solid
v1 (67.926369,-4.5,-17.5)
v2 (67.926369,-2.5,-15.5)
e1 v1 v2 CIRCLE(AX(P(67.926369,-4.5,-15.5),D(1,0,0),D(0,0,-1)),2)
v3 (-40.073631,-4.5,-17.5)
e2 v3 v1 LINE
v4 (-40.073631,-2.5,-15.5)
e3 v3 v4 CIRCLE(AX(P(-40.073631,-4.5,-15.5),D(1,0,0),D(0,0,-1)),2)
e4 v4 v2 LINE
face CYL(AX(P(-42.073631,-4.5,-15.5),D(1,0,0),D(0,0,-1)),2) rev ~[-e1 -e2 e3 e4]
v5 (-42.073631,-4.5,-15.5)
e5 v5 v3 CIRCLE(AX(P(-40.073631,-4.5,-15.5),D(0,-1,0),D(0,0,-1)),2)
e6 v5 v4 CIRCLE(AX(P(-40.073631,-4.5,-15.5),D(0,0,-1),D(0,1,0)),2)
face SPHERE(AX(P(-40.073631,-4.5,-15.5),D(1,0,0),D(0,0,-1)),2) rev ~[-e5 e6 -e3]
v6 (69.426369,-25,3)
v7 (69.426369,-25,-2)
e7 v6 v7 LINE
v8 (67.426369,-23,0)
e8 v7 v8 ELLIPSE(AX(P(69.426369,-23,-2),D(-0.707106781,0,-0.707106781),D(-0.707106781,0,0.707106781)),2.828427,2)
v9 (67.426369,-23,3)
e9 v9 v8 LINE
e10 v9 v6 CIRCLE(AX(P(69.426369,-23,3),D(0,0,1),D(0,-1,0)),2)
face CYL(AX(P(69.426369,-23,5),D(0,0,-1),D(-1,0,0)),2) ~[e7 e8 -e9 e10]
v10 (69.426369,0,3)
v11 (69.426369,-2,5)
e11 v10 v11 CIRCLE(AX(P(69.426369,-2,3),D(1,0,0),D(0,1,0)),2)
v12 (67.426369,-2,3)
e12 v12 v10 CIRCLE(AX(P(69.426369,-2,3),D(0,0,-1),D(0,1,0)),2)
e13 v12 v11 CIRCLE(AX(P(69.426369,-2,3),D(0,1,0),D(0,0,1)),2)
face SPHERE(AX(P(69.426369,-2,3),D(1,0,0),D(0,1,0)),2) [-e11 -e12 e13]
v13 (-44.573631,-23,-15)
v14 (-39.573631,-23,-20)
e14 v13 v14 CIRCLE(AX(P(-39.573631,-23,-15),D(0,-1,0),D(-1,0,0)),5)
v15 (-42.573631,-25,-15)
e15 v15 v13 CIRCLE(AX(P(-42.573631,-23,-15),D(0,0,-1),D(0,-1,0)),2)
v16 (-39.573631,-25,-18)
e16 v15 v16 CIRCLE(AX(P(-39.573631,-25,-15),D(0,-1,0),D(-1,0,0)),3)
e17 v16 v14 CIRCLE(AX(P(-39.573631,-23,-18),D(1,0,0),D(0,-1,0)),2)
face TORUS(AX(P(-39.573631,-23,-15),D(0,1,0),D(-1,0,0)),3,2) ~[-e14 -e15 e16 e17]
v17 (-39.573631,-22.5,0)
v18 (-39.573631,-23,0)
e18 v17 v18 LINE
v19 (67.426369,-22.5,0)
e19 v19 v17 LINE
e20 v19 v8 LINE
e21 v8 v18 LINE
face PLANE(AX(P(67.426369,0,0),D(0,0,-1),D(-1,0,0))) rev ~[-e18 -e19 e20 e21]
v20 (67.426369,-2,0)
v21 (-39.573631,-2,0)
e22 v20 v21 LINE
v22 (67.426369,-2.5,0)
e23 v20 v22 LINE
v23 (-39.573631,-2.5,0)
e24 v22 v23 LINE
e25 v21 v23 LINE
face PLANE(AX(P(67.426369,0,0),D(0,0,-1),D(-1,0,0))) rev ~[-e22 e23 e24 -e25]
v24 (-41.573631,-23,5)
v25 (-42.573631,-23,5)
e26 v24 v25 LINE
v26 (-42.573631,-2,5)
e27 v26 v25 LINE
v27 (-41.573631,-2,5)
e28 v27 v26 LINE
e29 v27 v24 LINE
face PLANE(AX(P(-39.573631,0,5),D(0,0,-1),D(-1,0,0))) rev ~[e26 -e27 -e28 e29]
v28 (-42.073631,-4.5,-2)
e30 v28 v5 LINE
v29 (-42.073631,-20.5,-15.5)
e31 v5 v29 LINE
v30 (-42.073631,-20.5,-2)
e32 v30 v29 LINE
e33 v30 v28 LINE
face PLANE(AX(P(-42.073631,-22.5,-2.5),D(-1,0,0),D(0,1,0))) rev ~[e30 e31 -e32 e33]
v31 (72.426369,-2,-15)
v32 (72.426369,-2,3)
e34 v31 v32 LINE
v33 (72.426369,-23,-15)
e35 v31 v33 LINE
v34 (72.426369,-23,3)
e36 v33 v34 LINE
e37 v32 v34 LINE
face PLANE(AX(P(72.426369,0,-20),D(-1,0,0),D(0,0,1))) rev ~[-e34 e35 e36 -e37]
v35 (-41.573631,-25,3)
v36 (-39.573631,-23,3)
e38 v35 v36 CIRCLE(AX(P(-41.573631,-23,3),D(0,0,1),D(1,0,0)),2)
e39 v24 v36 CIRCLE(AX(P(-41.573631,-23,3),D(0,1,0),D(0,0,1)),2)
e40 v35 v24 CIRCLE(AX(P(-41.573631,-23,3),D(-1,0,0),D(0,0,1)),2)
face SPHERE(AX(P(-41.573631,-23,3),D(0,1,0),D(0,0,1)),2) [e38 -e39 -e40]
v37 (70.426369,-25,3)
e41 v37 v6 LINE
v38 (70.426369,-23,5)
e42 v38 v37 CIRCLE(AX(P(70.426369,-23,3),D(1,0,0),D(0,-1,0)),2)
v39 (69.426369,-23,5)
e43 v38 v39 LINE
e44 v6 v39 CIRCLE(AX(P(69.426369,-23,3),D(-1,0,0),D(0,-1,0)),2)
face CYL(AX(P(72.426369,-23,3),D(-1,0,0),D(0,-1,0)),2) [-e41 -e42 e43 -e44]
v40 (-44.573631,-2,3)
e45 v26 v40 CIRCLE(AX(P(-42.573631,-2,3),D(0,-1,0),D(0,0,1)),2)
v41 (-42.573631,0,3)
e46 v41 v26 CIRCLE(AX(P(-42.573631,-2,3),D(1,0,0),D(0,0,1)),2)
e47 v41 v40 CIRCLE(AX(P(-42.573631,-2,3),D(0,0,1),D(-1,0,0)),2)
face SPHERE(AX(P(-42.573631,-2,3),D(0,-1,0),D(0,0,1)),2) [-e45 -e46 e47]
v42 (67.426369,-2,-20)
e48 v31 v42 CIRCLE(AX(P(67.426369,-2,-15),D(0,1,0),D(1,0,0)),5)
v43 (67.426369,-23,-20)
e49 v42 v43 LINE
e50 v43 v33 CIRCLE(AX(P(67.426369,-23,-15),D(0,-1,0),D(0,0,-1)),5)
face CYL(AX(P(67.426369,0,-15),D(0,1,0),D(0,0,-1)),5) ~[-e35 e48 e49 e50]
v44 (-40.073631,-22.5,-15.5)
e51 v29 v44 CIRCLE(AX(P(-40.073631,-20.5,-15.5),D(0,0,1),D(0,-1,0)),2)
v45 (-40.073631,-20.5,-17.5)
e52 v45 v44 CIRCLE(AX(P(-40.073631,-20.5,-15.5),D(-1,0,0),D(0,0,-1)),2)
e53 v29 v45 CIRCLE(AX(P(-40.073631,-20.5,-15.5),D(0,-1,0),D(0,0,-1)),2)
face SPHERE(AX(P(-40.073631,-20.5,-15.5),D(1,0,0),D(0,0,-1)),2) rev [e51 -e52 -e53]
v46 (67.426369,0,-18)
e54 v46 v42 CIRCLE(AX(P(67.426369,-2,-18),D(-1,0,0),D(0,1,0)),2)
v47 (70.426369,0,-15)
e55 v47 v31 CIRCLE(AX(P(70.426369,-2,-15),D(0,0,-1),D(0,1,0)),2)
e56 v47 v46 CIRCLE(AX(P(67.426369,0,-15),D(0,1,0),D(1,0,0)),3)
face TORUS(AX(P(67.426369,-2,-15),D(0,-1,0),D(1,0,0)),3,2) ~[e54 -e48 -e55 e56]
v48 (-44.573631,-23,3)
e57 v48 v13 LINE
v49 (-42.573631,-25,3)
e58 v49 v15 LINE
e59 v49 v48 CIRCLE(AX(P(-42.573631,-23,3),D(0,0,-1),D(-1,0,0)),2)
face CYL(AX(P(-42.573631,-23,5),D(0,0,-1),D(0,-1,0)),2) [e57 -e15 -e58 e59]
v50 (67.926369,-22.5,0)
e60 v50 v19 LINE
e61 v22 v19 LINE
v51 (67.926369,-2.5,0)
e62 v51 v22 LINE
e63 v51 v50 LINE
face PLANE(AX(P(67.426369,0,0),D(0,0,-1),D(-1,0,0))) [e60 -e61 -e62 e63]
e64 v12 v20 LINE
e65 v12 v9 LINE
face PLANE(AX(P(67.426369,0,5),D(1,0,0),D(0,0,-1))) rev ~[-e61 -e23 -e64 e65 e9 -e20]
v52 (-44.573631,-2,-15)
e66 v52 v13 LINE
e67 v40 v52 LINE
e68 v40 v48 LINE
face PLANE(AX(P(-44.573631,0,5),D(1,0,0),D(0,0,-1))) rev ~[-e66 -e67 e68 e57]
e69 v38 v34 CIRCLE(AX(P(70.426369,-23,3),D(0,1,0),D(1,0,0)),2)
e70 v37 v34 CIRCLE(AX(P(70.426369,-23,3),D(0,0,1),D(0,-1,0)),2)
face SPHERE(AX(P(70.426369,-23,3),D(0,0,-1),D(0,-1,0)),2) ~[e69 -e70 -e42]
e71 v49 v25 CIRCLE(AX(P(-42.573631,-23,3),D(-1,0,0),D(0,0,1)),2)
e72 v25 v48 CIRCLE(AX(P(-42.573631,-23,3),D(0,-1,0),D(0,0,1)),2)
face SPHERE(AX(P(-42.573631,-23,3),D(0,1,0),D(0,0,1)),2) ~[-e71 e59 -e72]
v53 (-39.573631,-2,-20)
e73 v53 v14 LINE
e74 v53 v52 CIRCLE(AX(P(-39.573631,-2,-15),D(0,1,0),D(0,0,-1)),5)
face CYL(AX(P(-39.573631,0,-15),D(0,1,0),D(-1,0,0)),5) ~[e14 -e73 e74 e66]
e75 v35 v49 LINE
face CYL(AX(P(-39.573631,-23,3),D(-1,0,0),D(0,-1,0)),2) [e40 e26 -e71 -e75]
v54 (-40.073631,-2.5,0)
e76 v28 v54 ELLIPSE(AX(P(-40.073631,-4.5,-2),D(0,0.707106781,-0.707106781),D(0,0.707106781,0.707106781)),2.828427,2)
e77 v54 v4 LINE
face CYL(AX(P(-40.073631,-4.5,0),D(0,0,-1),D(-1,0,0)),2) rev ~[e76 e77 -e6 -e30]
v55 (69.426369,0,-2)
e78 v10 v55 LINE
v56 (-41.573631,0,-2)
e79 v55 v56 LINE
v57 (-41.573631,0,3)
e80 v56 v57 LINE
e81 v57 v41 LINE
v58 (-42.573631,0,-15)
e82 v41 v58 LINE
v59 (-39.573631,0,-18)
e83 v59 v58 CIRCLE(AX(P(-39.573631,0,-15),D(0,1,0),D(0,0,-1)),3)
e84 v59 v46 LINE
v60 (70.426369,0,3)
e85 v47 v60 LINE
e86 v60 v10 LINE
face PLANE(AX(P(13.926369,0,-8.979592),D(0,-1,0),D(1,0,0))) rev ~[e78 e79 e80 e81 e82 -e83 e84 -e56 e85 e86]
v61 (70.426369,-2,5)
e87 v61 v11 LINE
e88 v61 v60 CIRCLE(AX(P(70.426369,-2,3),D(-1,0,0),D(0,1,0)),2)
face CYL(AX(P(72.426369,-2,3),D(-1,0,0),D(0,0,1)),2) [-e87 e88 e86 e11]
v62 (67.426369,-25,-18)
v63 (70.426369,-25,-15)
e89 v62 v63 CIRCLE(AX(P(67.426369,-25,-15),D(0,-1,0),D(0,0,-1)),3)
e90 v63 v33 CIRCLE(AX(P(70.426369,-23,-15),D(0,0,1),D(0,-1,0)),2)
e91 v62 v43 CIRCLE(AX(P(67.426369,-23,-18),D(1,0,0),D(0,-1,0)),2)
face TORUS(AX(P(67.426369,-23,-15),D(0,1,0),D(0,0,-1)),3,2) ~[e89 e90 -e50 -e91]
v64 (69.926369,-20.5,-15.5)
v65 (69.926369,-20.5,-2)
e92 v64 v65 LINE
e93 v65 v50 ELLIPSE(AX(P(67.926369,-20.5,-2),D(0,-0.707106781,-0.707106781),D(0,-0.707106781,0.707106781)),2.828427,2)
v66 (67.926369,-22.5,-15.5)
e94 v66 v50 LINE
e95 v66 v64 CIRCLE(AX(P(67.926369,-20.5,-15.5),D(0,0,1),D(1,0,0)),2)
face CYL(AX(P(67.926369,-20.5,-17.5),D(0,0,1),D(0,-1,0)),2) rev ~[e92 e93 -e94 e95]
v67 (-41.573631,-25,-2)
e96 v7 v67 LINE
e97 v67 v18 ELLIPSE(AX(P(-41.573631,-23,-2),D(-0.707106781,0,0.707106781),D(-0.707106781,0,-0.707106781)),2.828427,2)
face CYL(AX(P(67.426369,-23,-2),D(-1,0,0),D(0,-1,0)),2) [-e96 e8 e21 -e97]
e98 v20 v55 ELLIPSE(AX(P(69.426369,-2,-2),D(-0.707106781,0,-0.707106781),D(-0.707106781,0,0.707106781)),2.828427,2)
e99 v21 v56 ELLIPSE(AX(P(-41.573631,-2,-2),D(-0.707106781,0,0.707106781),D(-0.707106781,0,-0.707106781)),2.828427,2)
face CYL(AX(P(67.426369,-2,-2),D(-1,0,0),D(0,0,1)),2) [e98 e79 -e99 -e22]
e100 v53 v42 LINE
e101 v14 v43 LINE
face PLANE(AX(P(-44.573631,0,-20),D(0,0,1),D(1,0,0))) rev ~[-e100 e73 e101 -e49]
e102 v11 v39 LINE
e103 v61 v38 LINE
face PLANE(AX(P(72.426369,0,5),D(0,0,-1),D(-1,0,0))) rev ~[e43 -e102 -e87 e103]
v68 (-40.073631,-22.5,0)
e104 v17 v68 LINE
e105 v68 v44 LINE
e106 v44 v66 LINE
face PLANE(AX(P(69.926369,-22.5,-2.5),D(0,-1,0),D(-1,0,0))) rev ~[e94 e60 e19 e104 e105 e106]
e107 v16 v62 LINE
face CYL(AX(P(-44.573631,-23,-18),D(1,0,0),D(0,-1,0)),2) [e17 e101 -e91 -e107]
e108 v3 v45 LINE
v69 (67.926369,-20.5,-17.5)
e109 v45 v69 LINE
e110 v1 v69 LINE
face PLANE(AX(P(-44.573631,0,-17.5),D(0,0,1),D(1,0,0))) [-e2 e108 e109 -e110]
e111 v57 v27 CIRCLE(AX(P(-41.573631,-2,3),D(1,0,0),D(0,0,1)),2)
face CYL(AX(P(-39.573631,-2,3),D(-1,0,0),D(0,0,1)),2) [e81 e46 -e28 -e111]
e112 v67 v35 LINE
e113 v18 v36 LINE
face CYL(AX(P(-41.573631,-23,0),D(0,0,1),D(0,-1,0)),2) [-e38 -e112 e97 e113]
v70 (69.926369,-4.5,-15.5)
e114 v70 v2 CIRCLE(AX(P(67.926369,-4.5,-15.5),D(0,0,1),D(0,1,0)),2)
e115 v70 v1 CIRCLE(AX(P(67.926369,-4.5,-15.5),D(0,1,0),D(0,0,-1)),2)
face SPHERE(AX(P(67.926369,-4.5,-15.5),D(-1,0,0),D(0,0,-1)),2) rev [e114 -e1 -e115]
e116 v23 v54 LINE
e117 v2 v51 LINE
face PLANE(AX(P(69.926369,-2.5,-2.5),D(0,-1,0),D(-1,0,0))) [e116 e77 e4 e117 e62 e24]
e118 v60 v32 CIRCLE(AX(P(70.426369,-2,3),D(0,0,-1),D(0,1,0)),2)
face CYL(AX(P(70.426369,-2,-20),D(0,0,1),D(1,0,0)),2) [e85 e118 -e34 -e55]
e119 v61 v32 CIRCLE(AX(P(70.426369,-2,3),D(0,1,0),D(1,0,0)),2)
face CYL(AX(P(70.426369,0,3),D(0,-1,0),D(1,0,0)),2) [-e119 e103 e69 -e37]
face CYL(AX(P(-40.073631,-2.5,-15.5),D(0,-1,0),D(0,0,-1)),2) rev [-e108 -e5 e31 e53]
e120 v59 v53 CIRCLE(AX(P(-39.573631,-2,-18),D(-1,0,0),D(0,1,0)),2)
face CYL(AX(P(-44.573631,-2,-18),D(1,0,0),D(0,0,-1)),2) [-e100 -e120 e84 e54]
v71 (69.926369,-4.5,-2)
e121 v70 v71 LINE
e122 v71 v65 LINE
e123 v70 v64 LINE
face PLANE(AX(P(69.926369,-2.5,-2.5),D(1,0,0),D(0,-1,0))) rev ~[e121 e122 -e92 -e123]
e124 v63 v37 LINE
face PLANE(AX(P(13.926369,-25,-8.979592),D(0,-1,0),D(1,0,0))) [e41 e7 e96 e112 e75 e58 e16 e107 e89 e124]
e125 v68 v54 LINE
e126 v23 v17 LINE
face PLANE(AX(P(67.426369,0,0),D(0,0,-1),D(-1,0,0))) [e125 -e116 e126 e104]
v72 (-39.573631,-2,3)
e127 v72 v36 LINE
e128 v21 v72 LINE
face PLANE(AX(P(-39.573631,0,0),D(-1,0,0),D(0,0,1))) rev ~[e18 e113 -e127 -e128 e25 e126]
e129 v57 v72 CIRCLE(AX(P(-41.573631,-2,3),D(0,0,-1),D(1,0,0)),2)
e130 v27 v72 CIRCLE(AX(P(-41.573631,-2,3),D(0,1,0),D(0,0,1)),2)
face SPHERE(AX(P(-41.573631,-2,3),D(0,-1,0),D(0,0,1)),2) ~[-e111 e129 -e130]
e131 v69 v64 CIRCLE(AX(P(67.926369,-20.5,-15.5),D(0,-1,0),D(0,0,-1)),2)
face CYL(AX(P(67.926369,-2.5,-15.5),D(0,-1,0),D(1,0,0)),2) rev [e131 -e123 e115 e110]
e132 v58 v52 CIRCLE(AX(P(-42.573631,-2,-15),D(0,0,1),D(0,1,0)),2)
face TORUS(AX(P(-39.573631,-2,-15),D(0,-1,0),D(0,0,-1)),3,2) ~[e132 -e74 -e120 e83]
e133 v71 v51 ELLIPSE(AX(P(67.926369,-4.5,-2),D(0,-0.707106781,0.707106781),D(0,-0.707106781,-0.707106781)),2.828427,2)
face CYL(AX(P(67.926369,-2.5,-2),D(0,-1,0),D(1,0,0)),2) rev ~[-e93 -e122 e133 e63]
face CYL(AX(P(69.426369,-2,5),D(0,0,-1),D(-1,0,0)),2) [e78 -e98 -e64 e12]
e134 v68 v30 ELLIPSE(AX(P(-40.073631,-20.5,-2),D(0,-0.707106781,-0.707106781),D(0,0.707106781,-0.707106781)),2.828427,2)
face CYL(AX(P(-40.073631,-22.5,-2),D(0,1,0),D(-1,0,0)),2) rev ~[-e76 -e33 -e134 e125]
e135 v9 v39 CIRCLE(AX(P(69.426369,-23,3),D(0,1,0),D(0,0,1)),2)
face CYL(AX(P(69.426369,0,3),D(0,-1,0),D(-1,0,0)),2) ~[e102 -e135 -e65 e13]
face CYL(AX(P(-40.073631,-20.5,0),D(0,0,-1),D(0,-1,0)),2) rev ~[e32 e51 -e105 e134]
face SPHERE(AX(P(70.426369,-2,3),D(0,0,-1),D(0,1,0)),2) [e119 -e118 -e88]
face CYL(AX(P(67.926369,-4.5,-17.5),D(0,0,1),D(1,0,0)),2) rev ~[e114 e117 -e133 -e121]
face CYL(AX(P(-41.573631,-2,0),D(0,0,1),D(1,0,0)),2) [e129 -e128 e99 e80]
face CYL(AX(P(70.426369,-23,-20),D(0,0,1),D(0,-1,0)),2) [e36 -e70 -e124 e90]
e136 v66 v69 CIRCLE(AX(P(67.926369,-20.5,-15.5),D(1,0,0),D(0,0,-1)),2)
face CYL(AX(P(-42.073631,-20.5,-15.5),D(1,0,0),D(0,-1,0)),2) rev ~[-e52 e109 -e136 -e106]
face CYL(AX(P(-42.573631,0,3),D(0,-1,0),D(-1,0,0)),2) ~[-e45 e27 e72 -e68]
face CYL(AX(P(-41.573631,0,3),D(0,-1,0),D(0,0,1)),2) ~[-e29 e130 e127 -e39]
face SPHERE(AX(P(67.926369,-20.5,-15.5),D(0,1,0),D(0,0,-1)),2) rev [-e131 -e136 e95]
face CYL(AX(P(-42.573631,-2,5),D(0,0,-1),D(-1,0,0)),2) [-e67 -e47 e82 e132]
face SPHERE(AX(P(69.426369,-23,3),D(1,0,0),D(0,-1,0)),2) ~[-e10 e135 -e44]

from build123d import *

# Parameters (mm, degrees)
F1_DEPTH     = 25
F2_T         = -2.5
F3_R         = 2
F4_T1_DEPTH  = 25
F4_T4_ANGLE  = 90
F4_T6_ANGLE  = 90
F4_T8_ANGLE  = 90
F4_T10_ANGLE = 90


# Not quite as in the source:
# - a fillet or chamfer that OpenCascade refuses, or shapes differently, is made with other operations: its cross-section is extruded or revolved along the edge and cut away or added
# - a shell that OpenCascade refuses in one call is made with other operations: the cavity is built on its own and cut out


with BuildPart() as f1:
    # F0 (on Front) → F1 (new body)
    with BuildSketch(Plane.XZ):
        Polygon((67.4263688624, 0), (-39.5736311376, 0), (-39.5736311376, 5), (-44.5736311376, 5), (-44.5736311376, -20), (72.4263688624, -20), (72.4263688624, 5), (67.4263688624, 5), align=None)
    extrude(amount=F1_DEPTH)

    # F2: a shell. OpenCascade refuses it in one call, so the cavity is built on its own and cut out:
    # the body offset inwards by the wall thickness, plus a prism from it out through each open face.
    f2_core = offset(f1.part, amount=F2_T, kind=Kind.INTERSECTION, mode=Mode.PRIVATE)
    f2_exits = [f2_core.faces().sort_by_distance(p)[0] for p in [
        (13.926369, -12.5, -2.5),
    ]]
    add(f2_core, mode=Mode.SUBTRACT)
    extrude(f2_exits, amount=-F2_T, mode=Mode.SUBTRACT)

    # F3
    f3_edges = [f1.edges().sort_by_distance(p)[0] for p in [
        (-39.573631, -12.5, 5),
        (-44.573631, -12.5, 5),
        (-42.073631, 0, 5),
        (-42.073631, -25, 5),
        (13.926369, -25, 0),
        (-39.573631, -25, 2.5),
        (-44.573631, -25, -7.5),
        (13.926369, -25, -20),
        (72.426369, -25, -7.5),
        (69.926369, -25, 5),
        (67.426369, -25, 2.5),
        (13.926369, 0, 0),
        (-39.573631, 0, 2.5),
        (-44.573631, 0, -7.5),
        (13.926369, 0, -20),
        (72.426369, 0, -7.5),
        (69.926369, 0, 5),
        (67.426369, 0, 2.5),
        (13.926369, -2.5, -17.5),
        (69.926369, -12.5, -17.5),
        (13.926369, -22.5, -17.5),
        (-42.073631, -12.5, -17.5),
        (-42.073631, -22.5, -8.75),
        (-42.073631, -12.5, 0),
        (-42.073631, -2.5, -8.75),
        (69.926369, -12.5, 0),
        (69.926369, -22.5, -8.75),
        (69.926369, -2.5, -8.75),
        (72.426369, -12.5, 5),
        (67.426369, -12.5, 5),
    ]]
    fillet(f3_edges, radius=F3_R)

    # F4: fillet of radius 5 on 2 edges, made by hand

    # F4_s2 → F4_t1 (cut)
    with BuildSketch(Plane.XZ):
        with BuildLine():
            ThreePointArc((67.4263688624, -20), (70.9619027683, -18.5355339059), (72.4263688624, -15))
            Line((72.4263688624, -15), (72.4263688624, -20))
            Line((72.4263688624, -20), (67.4263688624, -20))
        make_face()
        with BuildLine():
            ThreePointArc((-44.5736311376, -15), (-43.1091650435, -18.5355339059), (-39.5736311376, -20))
            Line((-39.5736311376, -20), (-44.5736311376, -20))
            Line((-44.5736311376, -20), (-44.5736311376, -15))
        make_face()
    extrude(amount=F4_T1_DEPTH, mode=Mode.SUBTRACT)

    # F4_s3 → F4_t4 (revolve, cut)
    with BuildSketch(Plane.YZ.offset(-39.5736311376)):
        with BuildLine():
            ThreePointArc((0, -18), (-0.5857864376, -19.4142135624), (-2, -20))
            Line((-2, -20), (0, -20))
            Line((0, -20), (0, -18))
        make_face()
    revolve(axis=Axis((-39.5736311376, 0, -15), (0, 1, 0)), revolution_arc=F4_T4_ANGLE, mode=Mode.SUBTRACT)

    # F4_s5 → F4_t6 (revolve, cut)
    with BuildSketch(Plane.XY.offset(-15)):
        with BuildLine():
            ThreePointArc((-42.5736311376, -25), (-43.9878447, -24.4142135624), (-44.5736311376, -23))
            Line((-44.5736311376, -23), (-44.5736311376, -25))
            Line((-44.5736311376, -25), (-42.5736311376, -25))
        make_face()
    revolve(axis=Axis((-39.5736311376, -25, -15), (0, -1, 0)), revolution_arc=F4_T6_ANGLE, mode=Mode.SUBTRACT)

    # F4_s7 → F4_t8 (revolve, cut)
    with BuildSketch(Plane.XY.offset(-15)):
        with BuildLine():
            ThreePointArc((70.4263688624, 0), (71.8405824248, -0.5857864376), (72.4263688624, -2))
            Line((72.4263688624, -2), (72.4263688624, 0))
            Line((72.4263688624, 0), (70.4263688624, 0))
        make_face()
    revolve(axis=Axis((67.4263688624, 0, -15), (0, 1, 0)), revolution_arc=F4_T8_ANGLE, mode=Mode.SUBTRACT)

    # F4_s9 → F4_t10 (revolve, cut)
    with BuildSketch(Plane.YZ.offset(67.4263688624)):
        with BuildLine():
            ThreePointArc((-25, -18), (-24.4142135624, -19.4142135624), (-23, -20))
            Line((-23, -20), (-25, -20))
            Line((-25, -20), (-25, -18))
        make_face()
    revolve(axis=Axis((67.4263688624, -25, -15), (0, -1, 0)), revolution_arc=F4_T10_ANGLE, mode=Mode.SUBTRACT)


solid = f1.part
